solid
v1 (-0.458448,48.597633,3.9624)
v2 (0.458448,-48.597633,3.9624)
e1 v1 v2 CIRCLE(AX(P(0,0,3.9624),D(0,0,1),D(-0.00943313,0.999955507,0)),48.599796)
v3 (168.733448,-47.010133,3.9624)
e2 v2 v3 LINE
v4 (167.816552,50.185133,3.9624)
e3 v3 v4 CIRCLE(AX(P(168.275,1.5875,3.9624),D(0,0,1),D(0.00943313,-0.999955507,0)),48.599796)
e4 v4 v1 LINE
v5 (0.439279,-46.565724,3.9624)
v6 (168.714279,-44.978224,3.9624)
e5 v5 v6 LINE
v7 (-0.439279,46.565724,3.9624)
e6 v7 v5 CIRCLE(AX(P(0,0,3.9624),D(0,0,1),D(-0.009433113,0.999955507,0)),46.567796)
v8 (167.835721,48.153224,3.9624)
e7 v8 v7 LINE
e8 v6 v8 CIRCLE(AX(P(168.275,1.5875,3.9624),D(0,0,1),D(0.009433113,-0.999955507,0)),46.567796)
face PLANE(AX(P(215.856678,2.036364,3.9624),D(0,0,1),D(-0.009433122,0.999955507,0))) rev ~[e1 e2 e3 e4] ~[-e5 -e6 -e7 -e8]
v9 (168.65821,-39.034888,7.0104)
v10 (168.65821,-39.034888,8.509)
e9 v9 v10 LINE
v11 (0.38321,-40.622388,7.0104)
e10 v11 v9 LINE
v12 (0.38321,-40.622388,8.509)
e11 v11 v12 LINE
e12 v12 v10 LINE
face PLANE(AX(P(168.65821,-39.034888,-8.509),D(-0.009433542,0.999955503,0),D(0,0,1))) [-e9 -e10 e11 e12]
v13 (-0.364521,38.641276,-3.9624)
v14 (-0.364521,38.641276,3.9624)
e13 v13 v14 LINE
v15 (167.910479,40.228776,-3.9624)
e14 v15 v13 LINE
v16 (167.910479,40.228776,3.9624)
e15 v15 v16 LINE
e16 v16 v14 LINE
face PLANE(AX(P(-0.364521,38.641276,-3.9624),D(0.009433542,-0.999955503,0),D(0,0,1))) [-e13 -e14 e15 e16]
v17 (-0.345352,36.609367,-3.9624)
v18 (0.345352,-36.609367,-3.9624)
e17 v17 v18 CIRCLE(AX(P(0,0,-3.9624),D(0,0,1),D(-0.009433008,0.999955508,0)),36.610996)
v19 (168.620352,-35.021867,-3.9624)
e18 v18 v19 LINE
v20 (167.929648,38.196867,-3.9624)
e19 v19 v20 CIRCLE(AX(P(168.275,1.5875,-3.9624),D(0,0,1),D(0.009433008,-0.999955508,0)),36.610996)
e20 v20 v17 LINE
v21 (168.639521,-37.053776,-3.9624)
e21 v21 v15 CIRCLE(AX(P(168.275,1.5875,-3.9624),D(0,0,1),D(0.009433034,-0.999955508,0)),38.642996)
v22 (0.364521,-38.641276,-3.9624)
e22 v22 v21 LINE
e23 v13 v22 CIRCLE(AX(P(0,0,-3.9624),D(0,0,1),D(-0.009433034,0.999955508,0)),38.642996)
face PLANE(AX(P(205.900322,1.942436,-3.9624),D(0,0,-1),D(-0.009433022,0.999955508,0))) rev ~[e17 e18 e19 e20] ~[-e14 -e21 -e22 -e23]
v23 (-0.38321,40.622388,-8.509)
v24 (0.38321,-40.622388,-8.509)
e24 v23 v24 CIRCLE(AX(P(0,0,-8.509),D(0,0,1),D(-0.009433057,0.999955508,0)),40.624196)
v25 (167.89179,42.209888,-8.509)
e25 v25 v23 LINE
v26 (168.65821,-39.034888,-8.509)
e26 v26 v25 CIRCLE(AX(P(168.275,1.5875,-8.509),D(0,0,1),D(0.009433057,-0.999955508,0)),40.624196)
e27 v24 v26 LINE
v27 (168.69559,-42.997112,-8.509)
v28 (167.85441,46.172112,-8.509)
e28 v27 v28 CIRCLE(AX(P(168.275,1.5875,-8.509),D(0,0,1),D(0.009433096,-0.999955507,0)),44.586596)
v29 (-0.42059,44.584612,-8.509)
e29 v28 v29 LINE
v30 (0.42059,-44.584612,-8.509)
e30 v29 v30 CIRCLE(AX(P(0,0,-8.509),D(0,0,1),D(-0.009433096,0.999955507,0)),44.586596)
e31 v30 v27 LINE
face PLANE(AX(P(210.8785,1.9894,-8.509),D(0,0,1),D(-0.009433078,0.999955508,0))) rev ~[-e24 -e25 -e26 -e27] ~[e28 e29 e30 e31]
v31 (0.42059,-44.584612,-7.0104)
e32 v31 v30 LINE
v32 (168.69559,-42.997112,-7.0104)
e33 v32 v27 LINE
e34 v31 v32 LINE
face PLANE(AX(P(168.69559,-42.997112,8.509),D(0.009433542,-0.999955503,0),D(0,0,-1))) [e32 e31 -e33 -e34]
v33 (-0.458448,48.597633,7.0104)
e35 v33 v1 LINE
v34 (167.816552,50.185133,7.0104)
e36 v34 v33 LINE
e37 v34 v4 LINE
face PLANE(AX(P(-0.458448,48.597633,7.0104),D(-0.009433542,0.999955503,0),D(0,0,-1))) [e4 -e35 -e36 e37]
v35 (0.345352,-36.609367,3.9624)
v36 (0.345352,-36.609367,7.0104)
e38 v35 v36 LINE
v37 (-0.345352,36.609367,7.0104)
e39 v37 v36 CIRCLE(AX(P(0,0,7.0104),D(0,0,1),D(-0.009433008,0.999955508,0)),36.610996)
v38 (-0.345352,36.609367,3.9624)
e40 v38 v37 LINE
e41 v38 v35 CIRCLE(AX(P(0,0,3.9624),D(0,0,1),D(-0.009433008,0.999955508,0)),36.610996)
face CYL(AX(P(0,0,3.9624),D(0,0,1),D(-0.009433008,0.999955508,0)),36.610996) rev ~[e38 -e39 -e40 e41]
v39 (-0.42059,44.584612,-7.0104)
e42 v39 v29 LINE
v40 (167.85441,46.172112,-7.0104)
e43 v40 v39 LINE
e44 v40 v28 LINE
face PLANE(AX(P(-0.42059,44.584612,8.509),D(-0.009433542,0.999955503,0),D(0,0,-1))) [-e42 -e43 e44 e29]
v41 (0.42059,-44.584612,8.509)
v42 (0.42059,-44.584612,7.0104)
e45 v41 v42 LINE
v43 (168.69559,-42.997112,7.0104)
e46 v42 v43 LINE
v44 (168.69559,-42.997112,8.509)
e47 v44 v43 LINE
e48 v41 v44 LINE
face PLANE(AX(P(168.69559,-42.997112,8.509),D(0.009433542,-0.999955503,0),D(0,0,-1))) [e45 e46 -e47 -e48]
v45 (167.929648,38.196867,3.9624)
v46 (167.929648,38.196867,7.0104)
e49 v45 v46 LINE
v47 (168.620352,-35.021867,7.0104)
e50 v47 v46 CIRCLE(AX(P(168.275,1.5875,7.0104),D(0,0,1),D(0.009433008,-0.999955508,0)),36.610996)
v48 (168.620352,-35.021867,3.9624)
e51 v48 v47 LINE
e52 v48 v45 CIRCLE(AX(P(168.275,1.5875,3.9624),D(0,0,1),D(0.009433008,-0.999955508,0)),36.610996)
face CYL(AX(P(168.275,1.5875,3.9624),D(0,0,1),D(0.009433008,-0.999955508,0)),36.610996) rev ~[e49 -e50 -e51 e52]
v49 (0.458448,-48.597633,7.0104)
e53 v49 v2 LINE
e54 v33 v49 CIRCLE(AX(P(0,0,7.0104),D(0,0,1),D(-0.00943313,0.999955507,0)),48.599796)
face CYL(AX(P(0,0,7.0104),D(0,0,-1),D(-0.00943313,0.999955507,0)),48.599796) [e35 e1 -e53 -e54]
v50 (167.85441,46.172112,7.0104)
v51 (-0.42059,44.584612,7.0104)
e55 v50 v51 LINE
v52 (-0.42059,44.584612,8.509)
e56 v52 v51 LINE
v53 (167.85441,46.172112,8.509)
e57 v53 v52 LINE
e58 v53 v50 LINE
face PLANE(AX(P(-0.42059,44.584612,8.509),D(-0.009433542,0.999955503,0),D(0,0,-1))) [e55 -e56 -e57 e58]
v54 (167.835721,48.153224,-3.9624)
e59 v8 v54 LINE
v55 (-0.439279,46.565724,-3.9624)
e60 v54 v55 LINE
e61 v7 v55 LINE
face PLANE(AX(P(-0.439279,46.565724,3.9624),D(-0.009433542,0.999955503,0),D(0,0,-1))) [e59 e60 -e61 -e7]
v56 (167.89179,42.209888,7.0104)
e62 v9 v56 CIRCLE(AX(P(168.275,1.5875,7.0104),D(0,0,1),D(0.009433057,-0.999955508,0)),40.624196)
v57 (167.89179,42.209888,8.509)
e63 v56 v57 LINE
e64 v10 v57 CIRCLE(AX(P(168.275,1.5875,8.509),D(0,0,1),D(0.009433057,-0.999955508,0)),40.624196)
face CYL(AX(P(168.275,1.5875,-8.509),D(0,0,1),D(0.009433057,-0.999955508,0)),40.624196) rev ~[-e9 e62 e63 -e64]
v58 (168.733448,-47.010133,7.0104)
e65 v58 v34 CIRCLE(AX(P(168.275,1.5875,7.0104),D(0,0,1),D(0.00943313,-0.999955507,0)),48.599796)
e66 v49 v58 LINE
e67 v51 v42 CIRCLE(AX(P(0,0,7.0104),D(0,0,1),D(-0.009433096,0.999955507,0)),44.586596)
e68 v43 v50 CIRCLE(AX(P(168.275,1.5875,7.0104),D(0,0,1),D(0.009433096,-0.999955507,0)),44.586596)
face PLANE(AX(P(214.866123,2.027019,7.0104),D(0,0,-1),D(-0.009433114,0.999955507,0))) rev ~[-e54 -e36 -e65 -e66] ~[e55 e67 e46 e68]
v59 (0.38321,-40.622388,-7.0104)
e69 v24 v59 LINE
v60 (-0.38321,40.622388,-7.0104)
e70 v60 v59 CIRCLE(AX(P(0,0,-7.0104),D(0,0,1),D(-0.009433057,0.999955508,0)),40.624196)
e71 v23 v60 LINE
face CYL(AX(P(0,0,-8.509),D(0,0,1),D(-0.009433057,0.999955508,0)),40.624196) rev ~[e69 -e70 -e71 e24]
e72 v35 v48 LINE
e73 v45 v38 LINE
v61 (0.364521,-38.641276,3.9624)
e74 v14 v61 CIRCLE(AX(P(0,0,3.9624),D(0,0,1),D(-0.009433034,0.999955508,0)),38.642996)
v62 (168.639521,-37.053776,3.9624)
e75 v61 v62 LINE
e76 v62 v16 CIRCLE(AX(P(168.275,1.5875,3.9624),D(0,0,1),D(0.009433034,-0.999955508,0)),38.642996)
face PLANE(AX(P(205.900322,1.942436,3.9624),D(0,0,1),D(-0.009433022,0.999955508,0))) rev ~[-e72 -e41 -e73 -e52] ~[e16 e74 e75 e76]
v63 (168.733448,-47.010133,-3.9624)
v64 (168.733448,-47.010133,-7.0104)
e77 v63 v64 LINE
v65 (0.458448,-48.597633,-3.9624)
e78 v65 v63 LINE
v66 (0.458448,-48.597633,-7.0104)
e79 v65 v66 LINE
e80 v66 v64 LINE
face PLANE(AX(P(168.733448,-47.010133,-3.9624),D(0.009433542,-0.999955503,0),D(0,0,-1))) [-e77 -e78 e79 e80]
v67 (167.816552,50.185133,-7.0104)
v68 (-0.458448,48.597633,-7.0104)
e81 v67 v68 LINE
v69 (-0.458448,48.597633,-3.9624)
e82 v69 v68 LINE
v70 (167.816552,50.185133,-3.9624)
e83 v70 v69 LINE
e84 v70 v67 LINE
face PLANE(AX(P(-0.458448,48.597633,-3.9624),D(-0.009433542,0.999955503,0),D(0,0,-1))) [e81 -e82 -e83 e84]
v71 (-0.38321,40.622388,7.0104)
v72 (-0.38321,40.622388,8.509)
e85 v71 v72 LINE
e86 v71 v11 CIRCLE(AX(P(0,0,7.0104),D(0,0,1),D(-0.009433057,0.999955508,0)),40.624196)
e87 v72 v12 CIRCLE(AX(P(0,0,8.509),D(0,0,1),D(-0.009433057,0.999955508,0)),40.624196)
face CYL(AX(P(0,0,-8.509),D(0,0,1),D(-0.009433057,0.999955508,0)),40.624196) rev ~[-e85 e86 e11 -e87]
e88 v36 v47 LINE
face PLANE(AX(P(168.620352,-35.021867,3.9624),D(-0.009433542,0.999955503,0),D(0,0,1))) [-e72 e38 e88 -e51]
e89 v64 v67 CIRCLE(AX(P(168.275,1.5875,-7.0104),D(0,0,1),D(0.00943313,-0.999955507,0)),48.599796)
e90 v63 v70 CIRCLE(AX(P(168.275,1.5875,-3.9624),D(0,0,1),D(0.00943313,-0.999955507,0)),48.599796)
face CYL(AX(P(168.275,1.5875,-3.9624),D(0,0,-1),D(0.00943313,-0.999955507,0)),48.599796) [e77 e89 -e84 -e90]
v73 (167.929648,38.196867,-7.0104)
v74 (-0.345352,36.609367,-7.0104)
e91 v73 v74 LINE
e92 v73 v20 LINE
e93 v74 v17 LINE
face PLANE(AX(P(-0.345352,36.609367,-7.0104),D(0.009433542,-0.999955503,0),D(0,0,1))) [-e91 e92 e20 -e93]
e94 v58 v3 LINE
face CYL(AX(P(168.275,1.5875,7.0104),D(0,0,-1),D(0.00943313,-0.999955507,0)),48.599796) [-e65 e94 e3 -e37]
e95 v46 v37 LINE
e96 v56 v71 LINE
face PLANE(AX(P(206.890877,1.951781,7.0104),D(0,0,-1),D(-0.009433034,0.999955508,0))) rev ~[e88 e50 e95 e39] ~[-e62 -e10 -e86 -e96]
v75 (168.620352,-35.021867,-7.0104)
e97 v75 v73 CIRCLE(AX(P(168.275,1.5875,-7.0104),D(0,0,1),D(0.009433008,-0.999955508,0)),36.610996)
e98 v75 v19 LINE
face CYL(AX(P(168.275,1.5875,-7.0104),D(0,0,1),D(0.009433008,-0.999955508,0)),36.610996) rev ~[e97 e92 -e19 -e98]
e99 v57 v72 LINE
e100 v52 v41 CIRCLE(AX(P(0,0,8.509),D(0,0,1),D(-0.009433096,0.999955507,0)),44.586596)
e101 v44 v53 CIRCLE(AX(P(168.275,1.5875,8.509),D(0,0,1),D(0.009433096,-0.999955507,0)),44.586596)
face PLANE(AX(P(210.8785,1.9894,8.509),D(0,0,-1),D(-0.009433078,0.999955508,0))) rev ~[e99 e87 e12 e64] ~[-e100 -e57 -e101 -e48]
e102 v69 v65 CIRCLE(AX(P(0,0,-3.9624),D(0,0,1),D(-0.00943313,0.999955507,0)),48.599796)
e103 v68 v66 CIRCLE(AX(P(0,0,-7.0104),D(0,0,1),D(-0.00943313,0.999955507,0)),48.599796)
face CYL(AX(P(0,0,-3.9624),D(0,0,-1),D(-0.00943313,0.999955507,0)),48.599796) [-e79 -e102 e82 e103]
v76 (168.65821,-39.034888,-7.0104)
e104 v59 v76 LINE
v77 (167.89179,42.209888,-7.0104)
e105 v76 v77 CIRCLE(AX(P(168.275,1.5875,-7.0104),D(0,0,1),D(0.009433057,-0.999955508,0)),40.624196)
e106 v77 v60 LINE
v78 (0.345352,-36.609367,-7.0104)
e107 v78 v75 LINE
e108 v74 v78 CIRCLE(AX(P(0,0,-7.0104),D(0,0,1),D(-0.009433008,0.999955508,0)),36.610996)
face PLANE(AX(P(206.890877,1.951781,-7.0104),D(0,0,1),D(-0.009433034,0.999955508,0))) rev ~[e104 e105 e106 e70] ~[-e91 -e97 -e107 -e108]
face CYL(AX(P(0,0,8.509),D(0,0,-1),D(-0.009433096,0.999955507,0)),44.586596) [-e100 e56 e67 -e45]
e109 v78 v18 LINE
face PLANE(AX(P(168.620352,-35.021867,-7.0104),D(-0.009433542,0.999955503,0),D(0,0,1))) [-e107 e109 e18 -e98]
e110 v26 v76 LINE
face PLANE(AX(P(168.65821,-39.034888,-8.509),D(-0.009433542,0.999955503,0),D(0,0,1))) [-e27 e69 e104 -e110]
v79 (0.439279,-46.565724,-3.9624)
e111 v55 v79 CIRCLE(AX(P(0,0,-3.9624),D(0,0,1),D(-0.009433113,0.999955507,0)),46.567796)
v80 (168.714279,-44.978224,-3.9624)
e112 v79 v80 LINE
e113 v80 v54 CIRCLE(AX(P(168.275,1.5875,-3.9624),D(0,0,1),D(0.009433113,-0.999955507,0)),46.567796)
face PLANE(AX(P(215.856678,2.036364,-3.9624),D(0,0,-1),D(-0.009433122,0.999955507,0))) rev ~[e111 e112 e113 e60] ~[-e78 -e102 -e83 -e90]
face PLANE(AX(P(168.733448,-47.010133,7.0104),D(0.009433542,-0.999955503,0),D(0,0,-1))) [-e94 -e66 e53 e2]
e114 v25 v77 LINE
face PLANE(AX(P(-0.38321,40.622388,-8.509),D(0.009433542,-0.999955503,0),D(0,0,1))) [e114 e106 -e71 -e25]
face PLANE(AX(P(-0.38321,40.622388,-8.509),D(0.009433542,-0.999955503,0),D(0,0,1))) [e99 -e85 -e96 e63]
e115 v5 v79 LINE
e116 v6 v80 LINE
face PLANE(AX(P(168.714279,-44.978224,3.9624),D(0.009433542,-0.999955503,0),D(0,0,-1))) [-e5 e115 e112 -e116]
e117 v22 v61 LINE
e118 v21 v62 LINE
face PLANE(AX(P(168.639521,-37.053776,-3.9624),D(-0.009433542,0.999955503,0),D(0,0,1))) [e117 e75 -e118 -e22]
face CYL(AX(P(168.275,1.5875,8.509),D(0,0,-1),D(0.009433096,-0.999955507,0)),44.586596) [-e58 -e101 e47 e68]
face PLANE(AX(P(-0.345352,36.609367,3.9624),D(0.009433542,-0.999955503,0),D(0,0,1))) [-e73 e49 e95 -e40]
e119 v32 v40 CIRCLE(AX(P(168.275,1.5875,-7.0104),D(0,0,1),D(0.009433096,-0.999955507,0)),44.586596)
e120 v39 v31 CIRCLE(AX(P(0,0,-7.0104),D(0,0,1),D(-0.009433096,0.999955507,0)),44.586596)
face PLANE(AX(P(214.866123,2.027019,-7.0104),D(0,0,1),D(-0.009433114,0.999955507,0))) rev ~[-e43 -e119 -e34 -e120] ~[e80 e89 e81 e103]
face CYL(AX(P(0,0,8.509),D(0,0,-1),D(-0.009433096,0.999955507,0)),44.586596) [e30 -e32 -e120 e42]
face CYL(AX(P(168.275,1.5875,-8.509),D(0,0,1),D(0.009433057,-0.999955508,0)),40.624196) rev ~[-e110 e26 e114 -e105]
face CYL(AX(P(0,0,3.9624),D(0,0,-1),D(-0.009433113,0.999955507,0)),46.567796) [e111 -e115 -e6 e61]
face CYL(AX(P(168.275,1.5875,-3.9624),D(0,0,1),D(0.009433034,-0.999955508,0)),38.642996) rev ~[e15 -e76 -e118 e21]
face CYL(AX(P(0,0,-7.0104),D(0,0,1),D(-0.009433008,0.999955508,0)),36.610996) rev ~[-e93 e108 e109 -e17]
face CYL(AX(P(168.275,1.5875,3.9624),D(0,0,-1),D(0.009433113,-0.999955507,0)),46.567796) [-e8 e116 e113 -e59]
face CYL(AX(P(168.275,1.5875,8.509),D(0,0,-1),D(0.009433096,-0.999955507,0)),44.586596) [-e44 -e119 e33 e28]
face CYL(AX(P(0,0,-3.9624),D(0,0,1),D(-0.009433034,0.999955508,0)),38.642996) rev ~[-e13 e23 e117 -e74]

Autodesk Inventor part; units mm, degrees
ref_plane "Work Plane2" through (0, 0, 0) normal (-1, 0, 0) x (0, 0, 1)
ref_plane "Work Plane3" through (168.275, 1.5875, 0) normal (-0.9749588, 0.2223855, 0) x (0, 0, 1)
sketch "Path" plane through (0, 0, 0) normal (0, 0, 1) x (1, 0, 0)
  arc A0 (-0.4019, 42.6035) -> (0.4019, -42.6035) centre (0, 0) ccw
  arc A1 (168.6769, -41.016) -> (167.8731, 44.191) centre (168.275, 1.5875) ccw
  line L0 (168.6769, -41.016) -> (0.4019, -42.6035)
  line L1 (-0.4019, 42.6035) -> (167.8731, 44.191)
  dimension "d31" = 11.9888
ref_plane "Section Plane" through (0.4019, -42.6035, 0) normal (0.9999555, 0.0094335, 0) x (0, 0, 1)
sketch "Section Sketch" plane through (0.4019, -42.6035, 0) normal (0.9999555, 0.0094335, 0) x (0, 0, 1)
  line L0 (-8.509, -1.9812) -> (8.509, -1.9812)
  line L1 (8.509, -1.9812) -> (8.509, 1.9812)
  line L2 (8.509, 1.9812) -> (-8.509, 1.9812)
  line L3 (-8.509, 1.9812) -> (-8.509, -1.9812)
  line L4 (-3.9624, -3.9624) -> (3.9624, -3.9624)
  line L5 (3.9624, -3.9624) -> (3.9624, 3.9624)
  line L6 (3.9624, 3.9624) -> (-3.9624, 3.9624)
  line L7 (-3.9624, 3.9624) -> (-3.9624, -3.9624)
  line L8 (-3.9624, 0) -> (3.9624, 0) construction
  line L9 (-7.0104, -5.9944) -> (-3.9624, -5.9944)
  line L10 (-3.9624, -5.9944) -> (-3.9624, 5.9944)
  line L11 (-3.9624, 5.9944) -> (-7.0104, 5.9944)
  line L12 (-7.0104, 5.9944) -> (-7.0104, -5.9944)
  line L13 (3.9624, -5.9944) -> (7.0104, -5.9944)
  line L14 (7.0104, -5.9944) -> (7.0104, 5.9944)
  line L15 (7.0104, 5.9944) -> (3.9624, 5.9944)
  line L16 (3.9624, 5.9944) -> (3.9624, -5.9944)
  line L17 (-8.509, 0) -> (8.509, 0) construction
  point P0 (0, 0)
  point P1 (0, 0)
  dimension "d21" = 3.9624
  dimension "d22" = 7.9248
  dimension "d23" = 7.9248
  dimension "d24" = 3.048
  dimension "d31" = 11.9888
  dimension "d32" = 17.018
sweep "Solid" add profiles "Section Sketch" path "Path"
pattern_of_one "Strand Pattern"
equation "\"d21\" = da_d2"
equation "\"d22\" = da_d1"
equation "\"d23\" = da_b1"
equation "\"d24\" = da_t1 + da_t2"
equation "\"d30\" = da_pt"
equation "\"da_p\" = 12.7"
equation "\"da_b1\" = 7.9248"
equation "\"da_h2\" = 11.9888"
equation "\"da_h3\" = 10.3886"
equation "\"da_d1\" = 7.9248"
equation "\"da_d2\" = 3.9624"
equation "\"da_pt\" = 14.3764"
equation "\"da_b\" = 17.018"
equation "\"da_t1\" = 1.524"
equation "\"da_t2\" = 1.524"
properties part number "Roller Chain"
